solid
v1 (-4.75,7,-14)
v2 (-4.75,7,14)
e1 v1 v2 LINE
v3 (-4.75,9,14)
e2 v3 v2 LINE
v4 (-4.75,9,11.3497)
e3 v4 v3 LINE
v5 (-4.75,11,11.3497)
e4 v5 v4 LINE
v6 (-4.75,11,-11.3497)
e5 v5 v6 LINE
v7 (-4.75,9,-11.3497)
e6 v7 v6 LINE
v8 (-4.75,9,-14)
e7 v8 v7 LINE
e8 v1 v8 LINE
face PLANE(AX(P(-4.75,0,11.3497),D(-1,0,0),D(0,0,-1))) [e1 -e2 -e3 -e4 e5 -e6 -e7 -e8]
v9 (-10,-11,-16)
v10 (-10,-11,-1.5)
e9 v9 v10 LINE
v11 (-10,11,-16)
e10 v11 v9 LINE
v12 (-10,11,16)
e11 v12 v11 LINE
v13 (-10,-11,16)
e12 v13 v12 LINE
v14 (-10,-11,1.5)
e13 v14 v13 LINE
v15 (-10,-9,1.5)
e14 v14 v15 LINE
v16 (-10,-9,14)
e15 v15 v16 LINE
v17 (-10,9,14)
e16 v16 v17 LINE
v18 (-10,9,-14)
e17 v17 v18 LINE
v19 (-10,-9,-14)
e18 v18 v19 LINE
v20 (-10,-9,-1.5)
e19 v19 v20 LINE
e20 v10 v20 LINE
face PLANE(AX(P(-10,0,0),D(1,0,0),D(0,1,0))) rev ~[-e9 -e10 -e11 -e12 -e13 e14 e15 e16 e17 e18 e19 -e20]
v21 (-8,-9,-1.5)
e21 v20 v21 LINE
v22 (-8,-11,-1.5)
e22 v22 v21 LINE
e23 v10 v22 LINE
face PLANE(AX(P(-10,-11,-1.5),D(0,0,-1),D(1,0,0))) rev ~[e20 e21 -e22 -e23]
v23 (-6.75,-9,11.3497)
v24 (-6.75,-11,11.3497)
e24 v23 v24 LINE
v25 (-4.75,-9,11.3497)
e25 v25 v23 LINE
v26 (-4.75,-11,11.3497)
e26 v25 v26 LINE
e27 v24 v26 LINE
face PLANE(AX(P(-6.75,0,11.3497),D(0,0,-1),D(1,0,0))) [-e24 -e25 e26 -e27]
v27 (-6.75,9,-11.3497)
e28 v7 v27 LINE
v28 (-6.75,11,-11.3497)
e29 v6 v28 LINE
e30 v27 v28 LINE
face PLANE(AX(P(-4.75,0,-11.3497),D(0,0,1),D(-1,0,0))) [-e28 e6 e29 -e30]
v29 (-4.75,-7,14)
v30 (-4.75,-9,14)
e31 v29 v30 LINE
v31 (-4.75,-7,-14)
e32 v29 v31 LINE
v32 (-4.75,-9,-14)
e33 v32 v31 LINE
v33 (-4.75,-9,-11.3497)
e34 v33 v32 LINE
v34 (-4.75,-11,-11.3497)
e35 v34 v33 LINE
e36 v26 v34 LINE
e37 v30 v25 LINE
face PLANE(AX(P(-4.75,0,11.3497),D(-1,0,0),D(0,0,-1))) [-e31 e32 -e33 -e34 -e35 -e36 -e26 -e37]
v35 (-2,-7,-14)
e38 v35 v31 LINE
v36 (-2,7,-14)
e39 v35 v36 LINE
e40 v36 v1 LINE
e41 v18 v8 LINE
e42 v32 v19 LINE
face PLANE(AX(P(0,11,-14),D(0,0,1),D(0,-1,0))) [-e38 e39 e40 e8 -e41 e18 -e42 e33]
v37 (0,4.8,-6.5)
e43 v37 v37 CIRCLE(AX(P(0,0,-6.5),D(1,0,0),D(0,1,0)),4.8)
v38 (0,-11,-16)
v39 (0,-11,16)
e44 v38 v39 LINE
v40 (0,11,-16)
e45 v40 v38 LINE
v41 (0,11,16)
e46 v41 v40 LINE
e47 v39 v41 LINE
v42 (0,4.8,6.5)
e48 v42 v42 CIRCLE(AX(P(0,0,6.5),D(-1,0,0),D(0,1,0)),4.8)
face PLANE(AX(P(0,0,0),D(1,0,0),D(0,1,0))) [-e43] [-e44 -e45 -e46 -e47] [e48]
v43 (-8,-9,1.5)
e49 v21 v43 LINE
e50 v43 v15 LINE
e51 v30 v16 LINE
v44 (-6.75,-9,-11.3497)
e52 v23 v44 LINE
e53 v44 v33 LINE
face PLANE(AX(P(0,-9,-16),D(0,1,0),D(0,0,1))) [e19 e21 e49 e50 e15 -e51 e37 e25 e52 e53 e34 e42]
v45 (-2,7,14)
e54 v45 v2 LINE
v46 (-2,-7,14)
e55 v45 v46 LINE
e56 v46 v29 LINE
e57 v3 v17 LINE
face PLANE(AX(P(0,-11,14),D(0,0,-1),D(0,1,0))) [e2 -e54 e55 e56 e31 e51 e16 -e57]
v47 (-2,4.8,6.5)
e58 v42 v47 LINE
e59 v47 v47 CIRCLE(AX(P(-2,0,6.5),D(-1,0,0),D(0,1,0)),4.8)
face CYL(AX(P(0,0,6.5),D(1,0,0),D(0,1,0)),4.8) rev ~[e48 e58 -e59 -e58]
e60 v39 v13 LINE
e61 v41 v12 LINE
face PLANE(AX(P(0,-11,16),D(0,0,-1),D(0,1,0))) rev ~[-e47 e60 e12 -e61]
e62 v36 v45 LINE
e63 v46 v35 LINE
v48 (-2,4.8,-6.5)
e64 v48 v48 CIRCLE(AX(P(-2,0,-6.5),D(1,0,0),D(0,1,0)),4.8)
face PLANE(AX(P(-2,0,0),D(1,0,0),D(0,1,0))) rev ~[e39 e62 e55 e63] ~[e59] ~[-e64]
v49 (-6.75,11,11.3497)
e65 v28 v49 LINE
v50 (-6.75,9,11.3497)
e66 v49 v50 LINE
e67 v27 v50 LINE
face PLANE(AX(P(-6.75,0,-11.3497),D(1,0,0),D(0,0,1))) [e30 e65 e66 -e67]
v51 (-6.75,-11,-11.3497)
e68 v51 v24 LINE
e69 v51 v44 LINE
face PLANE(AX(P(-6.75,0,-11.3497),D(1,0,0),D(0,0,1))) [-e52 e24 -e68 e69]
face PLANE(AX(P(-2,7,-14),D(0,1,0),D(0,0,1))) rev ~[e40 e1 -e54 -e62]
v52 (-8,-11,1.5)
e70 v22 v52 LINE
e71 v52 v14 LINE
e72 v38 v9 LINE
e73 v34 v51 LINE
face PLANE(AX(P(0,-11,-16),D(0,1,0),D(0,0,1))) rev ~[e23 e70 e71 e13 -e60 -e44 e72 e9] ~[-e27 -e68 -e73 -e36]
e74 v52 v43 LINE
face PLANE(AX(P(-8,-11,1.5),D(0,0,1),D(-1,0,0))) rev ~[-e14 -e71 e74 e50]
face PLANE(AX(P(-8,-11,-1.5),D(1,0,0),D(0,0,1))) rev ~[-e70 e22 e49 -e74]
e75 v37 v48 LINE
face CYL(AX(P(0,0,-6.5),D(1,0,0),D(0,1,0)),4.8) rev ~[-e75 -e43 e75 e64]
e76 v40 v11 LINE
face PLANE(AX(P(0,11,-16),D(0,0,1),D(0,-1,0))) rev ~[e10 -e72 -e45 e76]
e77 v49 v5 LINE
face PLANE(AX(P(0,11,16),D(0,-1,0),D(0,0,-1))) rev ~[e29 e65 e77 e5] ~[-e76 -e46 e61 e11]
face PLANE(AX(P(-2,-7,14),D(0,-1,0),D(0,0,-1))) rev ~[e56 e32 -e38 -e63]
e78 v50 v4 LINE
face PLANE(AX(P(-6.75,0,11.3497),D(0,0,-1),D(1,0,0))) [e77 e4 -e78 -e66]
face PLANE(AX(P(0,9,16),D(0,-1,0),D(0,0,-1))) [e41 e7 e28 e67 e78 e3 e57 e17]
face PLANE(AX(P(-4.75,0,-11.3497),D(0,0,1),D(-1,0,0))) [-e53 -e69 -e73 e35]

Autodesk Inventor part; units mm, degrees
ref_plane "YZ Plane" through (0, 0, 0) normal (1, 0, 0) x (0, 1, 0)
ref_plane "XZ Plane" through (0, 0, 0) normal (0, 1, 0) x (-1, 0, 0)
ref_plane "XY Plane" through (0, 0, 0) normal (0, 0, 1) x (1, 0, 0)
sketch "Sketch2" plane through (0, 0, 0) normal (1, 0, 0) x (0, 1, 0)
  line L0 (11, -16) -> (-11, -16)
  line L1 (-11, -16) -> (-11, 16)
  line L2 (-11, 16) -> (11, 16)
  line L3 (11, 16) -> (11, -16)
  line L4 (11, -16) -> (-11, 16) construction
  line L5 (-11, -16) -> (11, 16) construction
  circle A0 centre (0, -6.5) radius 4.8
  circle A1 centre (0, 6.5) radius 4.8
  line L6 (0, 6.5) -> (0, 0)
  point P0 (0, 0)
  dimension "d8" = 22
  dimension "d9" = 32
  dimension "d14" = 9.6
  dimension "d15" = 13
  dimension "d23" = 6.5
  dimension "d24" = 9.6
  dimension "d25" = 13
extrude "Extrusion2" add sketch "Sketch2" against normal blind 10
shell "Shell1" thickness 2 removed faces 3 at (-10, 8.8868, -1.7838) at (-6.6667, 4.7378, -7.27) at (-6.6667, 4.7378, 5.73)
sketch "Sketch4" plane through (0, 0, 0) normal (0, 1, 0) x (-1, 0, 0)
  line L0 (2, -14) -> (2, 14) projected
  line L1 (2, 0) -> (4.75, 0) construction
  line L2 (4.75, -11.3497) -> (6.75, -11.3497)
  line L3 (6.75, -11.3497) -> (6.75, 11.3497)
  line L4 (6.75, 11.3497) -> (4.75, 11.3497)
  line L5 (4.75, 11.3497) -> (4.75, -11.3497)
  point P0 (0, 0)
  dimension "d19" = 2.75
  dimension "d20" = 2
extrude "Extrusion4" cut sketch "Sketch4" along normal mid plane 22
sketch "Sketch5" plane through (0, -11, -16) normal (0, -1, 0) x (1, 0, 0)
  line L0 (-10, 2) -> (-10, 30) projected
  line L1 (-8, 17.5) -> (-10, 17.5)
  line L2 (-10, 17.5) -> (-10, 14.5)
  line L3 (-10, 14.5) -> (-8, 14.5)
  line L4 (-8, 14.5) -> (-8, 17.5)
  line L5 (-8, 17.5) -> (-10, 14.5) construction
  line L6 (-10, 17.5) -> (-8, 14.5) construction
  line L7 (-10, 0) -> (-10, 32) projected
  point P0 (0, 16)
  dimension "d27" = 3
  dimension "d30" = 2
extrude "Extrusion5" cut sketch "Sketch5" against normal blind 2
sketch "Sketch6" plane through (-2, -9, 14) normal (-1, 0, 0) x (0, 0, 1)
  line L0 (0, 18) -> (0, 0) projected
  line L1 (-28, 16) -> (0, 16)
  line L2 (0, 16) -> (0, 2)
  line L3 (0, 2) -> (-28, 2)
  line L4 (-28, 2) -> (-28, 16)
  line L5 (-28, 16) -> (0, 2) construction
  line L6 (0, 16) -> (-28, 2) construction
  line L7 (-28, 18) -> (0, 18)
  line L8 (0, 18) -> (0, 0)
  line L9 (0, 0) -> (-28, 0)
  line L10 (-28, 0) -> (-28, 18)
  line L11 (-28, 18) -> (0, 0) construction
  line L12 (0, 18) -> (-28, 0) construction
  point P0 (-14, 9)
  dimension "d31" = 14
extrude "Extrusion6" add sketch "Sketch6" along normal blind 2.75 contours L0 L1 L10 L7 | L0 L9 L10 L3
properties part number "snapConnector_3DPrint"
